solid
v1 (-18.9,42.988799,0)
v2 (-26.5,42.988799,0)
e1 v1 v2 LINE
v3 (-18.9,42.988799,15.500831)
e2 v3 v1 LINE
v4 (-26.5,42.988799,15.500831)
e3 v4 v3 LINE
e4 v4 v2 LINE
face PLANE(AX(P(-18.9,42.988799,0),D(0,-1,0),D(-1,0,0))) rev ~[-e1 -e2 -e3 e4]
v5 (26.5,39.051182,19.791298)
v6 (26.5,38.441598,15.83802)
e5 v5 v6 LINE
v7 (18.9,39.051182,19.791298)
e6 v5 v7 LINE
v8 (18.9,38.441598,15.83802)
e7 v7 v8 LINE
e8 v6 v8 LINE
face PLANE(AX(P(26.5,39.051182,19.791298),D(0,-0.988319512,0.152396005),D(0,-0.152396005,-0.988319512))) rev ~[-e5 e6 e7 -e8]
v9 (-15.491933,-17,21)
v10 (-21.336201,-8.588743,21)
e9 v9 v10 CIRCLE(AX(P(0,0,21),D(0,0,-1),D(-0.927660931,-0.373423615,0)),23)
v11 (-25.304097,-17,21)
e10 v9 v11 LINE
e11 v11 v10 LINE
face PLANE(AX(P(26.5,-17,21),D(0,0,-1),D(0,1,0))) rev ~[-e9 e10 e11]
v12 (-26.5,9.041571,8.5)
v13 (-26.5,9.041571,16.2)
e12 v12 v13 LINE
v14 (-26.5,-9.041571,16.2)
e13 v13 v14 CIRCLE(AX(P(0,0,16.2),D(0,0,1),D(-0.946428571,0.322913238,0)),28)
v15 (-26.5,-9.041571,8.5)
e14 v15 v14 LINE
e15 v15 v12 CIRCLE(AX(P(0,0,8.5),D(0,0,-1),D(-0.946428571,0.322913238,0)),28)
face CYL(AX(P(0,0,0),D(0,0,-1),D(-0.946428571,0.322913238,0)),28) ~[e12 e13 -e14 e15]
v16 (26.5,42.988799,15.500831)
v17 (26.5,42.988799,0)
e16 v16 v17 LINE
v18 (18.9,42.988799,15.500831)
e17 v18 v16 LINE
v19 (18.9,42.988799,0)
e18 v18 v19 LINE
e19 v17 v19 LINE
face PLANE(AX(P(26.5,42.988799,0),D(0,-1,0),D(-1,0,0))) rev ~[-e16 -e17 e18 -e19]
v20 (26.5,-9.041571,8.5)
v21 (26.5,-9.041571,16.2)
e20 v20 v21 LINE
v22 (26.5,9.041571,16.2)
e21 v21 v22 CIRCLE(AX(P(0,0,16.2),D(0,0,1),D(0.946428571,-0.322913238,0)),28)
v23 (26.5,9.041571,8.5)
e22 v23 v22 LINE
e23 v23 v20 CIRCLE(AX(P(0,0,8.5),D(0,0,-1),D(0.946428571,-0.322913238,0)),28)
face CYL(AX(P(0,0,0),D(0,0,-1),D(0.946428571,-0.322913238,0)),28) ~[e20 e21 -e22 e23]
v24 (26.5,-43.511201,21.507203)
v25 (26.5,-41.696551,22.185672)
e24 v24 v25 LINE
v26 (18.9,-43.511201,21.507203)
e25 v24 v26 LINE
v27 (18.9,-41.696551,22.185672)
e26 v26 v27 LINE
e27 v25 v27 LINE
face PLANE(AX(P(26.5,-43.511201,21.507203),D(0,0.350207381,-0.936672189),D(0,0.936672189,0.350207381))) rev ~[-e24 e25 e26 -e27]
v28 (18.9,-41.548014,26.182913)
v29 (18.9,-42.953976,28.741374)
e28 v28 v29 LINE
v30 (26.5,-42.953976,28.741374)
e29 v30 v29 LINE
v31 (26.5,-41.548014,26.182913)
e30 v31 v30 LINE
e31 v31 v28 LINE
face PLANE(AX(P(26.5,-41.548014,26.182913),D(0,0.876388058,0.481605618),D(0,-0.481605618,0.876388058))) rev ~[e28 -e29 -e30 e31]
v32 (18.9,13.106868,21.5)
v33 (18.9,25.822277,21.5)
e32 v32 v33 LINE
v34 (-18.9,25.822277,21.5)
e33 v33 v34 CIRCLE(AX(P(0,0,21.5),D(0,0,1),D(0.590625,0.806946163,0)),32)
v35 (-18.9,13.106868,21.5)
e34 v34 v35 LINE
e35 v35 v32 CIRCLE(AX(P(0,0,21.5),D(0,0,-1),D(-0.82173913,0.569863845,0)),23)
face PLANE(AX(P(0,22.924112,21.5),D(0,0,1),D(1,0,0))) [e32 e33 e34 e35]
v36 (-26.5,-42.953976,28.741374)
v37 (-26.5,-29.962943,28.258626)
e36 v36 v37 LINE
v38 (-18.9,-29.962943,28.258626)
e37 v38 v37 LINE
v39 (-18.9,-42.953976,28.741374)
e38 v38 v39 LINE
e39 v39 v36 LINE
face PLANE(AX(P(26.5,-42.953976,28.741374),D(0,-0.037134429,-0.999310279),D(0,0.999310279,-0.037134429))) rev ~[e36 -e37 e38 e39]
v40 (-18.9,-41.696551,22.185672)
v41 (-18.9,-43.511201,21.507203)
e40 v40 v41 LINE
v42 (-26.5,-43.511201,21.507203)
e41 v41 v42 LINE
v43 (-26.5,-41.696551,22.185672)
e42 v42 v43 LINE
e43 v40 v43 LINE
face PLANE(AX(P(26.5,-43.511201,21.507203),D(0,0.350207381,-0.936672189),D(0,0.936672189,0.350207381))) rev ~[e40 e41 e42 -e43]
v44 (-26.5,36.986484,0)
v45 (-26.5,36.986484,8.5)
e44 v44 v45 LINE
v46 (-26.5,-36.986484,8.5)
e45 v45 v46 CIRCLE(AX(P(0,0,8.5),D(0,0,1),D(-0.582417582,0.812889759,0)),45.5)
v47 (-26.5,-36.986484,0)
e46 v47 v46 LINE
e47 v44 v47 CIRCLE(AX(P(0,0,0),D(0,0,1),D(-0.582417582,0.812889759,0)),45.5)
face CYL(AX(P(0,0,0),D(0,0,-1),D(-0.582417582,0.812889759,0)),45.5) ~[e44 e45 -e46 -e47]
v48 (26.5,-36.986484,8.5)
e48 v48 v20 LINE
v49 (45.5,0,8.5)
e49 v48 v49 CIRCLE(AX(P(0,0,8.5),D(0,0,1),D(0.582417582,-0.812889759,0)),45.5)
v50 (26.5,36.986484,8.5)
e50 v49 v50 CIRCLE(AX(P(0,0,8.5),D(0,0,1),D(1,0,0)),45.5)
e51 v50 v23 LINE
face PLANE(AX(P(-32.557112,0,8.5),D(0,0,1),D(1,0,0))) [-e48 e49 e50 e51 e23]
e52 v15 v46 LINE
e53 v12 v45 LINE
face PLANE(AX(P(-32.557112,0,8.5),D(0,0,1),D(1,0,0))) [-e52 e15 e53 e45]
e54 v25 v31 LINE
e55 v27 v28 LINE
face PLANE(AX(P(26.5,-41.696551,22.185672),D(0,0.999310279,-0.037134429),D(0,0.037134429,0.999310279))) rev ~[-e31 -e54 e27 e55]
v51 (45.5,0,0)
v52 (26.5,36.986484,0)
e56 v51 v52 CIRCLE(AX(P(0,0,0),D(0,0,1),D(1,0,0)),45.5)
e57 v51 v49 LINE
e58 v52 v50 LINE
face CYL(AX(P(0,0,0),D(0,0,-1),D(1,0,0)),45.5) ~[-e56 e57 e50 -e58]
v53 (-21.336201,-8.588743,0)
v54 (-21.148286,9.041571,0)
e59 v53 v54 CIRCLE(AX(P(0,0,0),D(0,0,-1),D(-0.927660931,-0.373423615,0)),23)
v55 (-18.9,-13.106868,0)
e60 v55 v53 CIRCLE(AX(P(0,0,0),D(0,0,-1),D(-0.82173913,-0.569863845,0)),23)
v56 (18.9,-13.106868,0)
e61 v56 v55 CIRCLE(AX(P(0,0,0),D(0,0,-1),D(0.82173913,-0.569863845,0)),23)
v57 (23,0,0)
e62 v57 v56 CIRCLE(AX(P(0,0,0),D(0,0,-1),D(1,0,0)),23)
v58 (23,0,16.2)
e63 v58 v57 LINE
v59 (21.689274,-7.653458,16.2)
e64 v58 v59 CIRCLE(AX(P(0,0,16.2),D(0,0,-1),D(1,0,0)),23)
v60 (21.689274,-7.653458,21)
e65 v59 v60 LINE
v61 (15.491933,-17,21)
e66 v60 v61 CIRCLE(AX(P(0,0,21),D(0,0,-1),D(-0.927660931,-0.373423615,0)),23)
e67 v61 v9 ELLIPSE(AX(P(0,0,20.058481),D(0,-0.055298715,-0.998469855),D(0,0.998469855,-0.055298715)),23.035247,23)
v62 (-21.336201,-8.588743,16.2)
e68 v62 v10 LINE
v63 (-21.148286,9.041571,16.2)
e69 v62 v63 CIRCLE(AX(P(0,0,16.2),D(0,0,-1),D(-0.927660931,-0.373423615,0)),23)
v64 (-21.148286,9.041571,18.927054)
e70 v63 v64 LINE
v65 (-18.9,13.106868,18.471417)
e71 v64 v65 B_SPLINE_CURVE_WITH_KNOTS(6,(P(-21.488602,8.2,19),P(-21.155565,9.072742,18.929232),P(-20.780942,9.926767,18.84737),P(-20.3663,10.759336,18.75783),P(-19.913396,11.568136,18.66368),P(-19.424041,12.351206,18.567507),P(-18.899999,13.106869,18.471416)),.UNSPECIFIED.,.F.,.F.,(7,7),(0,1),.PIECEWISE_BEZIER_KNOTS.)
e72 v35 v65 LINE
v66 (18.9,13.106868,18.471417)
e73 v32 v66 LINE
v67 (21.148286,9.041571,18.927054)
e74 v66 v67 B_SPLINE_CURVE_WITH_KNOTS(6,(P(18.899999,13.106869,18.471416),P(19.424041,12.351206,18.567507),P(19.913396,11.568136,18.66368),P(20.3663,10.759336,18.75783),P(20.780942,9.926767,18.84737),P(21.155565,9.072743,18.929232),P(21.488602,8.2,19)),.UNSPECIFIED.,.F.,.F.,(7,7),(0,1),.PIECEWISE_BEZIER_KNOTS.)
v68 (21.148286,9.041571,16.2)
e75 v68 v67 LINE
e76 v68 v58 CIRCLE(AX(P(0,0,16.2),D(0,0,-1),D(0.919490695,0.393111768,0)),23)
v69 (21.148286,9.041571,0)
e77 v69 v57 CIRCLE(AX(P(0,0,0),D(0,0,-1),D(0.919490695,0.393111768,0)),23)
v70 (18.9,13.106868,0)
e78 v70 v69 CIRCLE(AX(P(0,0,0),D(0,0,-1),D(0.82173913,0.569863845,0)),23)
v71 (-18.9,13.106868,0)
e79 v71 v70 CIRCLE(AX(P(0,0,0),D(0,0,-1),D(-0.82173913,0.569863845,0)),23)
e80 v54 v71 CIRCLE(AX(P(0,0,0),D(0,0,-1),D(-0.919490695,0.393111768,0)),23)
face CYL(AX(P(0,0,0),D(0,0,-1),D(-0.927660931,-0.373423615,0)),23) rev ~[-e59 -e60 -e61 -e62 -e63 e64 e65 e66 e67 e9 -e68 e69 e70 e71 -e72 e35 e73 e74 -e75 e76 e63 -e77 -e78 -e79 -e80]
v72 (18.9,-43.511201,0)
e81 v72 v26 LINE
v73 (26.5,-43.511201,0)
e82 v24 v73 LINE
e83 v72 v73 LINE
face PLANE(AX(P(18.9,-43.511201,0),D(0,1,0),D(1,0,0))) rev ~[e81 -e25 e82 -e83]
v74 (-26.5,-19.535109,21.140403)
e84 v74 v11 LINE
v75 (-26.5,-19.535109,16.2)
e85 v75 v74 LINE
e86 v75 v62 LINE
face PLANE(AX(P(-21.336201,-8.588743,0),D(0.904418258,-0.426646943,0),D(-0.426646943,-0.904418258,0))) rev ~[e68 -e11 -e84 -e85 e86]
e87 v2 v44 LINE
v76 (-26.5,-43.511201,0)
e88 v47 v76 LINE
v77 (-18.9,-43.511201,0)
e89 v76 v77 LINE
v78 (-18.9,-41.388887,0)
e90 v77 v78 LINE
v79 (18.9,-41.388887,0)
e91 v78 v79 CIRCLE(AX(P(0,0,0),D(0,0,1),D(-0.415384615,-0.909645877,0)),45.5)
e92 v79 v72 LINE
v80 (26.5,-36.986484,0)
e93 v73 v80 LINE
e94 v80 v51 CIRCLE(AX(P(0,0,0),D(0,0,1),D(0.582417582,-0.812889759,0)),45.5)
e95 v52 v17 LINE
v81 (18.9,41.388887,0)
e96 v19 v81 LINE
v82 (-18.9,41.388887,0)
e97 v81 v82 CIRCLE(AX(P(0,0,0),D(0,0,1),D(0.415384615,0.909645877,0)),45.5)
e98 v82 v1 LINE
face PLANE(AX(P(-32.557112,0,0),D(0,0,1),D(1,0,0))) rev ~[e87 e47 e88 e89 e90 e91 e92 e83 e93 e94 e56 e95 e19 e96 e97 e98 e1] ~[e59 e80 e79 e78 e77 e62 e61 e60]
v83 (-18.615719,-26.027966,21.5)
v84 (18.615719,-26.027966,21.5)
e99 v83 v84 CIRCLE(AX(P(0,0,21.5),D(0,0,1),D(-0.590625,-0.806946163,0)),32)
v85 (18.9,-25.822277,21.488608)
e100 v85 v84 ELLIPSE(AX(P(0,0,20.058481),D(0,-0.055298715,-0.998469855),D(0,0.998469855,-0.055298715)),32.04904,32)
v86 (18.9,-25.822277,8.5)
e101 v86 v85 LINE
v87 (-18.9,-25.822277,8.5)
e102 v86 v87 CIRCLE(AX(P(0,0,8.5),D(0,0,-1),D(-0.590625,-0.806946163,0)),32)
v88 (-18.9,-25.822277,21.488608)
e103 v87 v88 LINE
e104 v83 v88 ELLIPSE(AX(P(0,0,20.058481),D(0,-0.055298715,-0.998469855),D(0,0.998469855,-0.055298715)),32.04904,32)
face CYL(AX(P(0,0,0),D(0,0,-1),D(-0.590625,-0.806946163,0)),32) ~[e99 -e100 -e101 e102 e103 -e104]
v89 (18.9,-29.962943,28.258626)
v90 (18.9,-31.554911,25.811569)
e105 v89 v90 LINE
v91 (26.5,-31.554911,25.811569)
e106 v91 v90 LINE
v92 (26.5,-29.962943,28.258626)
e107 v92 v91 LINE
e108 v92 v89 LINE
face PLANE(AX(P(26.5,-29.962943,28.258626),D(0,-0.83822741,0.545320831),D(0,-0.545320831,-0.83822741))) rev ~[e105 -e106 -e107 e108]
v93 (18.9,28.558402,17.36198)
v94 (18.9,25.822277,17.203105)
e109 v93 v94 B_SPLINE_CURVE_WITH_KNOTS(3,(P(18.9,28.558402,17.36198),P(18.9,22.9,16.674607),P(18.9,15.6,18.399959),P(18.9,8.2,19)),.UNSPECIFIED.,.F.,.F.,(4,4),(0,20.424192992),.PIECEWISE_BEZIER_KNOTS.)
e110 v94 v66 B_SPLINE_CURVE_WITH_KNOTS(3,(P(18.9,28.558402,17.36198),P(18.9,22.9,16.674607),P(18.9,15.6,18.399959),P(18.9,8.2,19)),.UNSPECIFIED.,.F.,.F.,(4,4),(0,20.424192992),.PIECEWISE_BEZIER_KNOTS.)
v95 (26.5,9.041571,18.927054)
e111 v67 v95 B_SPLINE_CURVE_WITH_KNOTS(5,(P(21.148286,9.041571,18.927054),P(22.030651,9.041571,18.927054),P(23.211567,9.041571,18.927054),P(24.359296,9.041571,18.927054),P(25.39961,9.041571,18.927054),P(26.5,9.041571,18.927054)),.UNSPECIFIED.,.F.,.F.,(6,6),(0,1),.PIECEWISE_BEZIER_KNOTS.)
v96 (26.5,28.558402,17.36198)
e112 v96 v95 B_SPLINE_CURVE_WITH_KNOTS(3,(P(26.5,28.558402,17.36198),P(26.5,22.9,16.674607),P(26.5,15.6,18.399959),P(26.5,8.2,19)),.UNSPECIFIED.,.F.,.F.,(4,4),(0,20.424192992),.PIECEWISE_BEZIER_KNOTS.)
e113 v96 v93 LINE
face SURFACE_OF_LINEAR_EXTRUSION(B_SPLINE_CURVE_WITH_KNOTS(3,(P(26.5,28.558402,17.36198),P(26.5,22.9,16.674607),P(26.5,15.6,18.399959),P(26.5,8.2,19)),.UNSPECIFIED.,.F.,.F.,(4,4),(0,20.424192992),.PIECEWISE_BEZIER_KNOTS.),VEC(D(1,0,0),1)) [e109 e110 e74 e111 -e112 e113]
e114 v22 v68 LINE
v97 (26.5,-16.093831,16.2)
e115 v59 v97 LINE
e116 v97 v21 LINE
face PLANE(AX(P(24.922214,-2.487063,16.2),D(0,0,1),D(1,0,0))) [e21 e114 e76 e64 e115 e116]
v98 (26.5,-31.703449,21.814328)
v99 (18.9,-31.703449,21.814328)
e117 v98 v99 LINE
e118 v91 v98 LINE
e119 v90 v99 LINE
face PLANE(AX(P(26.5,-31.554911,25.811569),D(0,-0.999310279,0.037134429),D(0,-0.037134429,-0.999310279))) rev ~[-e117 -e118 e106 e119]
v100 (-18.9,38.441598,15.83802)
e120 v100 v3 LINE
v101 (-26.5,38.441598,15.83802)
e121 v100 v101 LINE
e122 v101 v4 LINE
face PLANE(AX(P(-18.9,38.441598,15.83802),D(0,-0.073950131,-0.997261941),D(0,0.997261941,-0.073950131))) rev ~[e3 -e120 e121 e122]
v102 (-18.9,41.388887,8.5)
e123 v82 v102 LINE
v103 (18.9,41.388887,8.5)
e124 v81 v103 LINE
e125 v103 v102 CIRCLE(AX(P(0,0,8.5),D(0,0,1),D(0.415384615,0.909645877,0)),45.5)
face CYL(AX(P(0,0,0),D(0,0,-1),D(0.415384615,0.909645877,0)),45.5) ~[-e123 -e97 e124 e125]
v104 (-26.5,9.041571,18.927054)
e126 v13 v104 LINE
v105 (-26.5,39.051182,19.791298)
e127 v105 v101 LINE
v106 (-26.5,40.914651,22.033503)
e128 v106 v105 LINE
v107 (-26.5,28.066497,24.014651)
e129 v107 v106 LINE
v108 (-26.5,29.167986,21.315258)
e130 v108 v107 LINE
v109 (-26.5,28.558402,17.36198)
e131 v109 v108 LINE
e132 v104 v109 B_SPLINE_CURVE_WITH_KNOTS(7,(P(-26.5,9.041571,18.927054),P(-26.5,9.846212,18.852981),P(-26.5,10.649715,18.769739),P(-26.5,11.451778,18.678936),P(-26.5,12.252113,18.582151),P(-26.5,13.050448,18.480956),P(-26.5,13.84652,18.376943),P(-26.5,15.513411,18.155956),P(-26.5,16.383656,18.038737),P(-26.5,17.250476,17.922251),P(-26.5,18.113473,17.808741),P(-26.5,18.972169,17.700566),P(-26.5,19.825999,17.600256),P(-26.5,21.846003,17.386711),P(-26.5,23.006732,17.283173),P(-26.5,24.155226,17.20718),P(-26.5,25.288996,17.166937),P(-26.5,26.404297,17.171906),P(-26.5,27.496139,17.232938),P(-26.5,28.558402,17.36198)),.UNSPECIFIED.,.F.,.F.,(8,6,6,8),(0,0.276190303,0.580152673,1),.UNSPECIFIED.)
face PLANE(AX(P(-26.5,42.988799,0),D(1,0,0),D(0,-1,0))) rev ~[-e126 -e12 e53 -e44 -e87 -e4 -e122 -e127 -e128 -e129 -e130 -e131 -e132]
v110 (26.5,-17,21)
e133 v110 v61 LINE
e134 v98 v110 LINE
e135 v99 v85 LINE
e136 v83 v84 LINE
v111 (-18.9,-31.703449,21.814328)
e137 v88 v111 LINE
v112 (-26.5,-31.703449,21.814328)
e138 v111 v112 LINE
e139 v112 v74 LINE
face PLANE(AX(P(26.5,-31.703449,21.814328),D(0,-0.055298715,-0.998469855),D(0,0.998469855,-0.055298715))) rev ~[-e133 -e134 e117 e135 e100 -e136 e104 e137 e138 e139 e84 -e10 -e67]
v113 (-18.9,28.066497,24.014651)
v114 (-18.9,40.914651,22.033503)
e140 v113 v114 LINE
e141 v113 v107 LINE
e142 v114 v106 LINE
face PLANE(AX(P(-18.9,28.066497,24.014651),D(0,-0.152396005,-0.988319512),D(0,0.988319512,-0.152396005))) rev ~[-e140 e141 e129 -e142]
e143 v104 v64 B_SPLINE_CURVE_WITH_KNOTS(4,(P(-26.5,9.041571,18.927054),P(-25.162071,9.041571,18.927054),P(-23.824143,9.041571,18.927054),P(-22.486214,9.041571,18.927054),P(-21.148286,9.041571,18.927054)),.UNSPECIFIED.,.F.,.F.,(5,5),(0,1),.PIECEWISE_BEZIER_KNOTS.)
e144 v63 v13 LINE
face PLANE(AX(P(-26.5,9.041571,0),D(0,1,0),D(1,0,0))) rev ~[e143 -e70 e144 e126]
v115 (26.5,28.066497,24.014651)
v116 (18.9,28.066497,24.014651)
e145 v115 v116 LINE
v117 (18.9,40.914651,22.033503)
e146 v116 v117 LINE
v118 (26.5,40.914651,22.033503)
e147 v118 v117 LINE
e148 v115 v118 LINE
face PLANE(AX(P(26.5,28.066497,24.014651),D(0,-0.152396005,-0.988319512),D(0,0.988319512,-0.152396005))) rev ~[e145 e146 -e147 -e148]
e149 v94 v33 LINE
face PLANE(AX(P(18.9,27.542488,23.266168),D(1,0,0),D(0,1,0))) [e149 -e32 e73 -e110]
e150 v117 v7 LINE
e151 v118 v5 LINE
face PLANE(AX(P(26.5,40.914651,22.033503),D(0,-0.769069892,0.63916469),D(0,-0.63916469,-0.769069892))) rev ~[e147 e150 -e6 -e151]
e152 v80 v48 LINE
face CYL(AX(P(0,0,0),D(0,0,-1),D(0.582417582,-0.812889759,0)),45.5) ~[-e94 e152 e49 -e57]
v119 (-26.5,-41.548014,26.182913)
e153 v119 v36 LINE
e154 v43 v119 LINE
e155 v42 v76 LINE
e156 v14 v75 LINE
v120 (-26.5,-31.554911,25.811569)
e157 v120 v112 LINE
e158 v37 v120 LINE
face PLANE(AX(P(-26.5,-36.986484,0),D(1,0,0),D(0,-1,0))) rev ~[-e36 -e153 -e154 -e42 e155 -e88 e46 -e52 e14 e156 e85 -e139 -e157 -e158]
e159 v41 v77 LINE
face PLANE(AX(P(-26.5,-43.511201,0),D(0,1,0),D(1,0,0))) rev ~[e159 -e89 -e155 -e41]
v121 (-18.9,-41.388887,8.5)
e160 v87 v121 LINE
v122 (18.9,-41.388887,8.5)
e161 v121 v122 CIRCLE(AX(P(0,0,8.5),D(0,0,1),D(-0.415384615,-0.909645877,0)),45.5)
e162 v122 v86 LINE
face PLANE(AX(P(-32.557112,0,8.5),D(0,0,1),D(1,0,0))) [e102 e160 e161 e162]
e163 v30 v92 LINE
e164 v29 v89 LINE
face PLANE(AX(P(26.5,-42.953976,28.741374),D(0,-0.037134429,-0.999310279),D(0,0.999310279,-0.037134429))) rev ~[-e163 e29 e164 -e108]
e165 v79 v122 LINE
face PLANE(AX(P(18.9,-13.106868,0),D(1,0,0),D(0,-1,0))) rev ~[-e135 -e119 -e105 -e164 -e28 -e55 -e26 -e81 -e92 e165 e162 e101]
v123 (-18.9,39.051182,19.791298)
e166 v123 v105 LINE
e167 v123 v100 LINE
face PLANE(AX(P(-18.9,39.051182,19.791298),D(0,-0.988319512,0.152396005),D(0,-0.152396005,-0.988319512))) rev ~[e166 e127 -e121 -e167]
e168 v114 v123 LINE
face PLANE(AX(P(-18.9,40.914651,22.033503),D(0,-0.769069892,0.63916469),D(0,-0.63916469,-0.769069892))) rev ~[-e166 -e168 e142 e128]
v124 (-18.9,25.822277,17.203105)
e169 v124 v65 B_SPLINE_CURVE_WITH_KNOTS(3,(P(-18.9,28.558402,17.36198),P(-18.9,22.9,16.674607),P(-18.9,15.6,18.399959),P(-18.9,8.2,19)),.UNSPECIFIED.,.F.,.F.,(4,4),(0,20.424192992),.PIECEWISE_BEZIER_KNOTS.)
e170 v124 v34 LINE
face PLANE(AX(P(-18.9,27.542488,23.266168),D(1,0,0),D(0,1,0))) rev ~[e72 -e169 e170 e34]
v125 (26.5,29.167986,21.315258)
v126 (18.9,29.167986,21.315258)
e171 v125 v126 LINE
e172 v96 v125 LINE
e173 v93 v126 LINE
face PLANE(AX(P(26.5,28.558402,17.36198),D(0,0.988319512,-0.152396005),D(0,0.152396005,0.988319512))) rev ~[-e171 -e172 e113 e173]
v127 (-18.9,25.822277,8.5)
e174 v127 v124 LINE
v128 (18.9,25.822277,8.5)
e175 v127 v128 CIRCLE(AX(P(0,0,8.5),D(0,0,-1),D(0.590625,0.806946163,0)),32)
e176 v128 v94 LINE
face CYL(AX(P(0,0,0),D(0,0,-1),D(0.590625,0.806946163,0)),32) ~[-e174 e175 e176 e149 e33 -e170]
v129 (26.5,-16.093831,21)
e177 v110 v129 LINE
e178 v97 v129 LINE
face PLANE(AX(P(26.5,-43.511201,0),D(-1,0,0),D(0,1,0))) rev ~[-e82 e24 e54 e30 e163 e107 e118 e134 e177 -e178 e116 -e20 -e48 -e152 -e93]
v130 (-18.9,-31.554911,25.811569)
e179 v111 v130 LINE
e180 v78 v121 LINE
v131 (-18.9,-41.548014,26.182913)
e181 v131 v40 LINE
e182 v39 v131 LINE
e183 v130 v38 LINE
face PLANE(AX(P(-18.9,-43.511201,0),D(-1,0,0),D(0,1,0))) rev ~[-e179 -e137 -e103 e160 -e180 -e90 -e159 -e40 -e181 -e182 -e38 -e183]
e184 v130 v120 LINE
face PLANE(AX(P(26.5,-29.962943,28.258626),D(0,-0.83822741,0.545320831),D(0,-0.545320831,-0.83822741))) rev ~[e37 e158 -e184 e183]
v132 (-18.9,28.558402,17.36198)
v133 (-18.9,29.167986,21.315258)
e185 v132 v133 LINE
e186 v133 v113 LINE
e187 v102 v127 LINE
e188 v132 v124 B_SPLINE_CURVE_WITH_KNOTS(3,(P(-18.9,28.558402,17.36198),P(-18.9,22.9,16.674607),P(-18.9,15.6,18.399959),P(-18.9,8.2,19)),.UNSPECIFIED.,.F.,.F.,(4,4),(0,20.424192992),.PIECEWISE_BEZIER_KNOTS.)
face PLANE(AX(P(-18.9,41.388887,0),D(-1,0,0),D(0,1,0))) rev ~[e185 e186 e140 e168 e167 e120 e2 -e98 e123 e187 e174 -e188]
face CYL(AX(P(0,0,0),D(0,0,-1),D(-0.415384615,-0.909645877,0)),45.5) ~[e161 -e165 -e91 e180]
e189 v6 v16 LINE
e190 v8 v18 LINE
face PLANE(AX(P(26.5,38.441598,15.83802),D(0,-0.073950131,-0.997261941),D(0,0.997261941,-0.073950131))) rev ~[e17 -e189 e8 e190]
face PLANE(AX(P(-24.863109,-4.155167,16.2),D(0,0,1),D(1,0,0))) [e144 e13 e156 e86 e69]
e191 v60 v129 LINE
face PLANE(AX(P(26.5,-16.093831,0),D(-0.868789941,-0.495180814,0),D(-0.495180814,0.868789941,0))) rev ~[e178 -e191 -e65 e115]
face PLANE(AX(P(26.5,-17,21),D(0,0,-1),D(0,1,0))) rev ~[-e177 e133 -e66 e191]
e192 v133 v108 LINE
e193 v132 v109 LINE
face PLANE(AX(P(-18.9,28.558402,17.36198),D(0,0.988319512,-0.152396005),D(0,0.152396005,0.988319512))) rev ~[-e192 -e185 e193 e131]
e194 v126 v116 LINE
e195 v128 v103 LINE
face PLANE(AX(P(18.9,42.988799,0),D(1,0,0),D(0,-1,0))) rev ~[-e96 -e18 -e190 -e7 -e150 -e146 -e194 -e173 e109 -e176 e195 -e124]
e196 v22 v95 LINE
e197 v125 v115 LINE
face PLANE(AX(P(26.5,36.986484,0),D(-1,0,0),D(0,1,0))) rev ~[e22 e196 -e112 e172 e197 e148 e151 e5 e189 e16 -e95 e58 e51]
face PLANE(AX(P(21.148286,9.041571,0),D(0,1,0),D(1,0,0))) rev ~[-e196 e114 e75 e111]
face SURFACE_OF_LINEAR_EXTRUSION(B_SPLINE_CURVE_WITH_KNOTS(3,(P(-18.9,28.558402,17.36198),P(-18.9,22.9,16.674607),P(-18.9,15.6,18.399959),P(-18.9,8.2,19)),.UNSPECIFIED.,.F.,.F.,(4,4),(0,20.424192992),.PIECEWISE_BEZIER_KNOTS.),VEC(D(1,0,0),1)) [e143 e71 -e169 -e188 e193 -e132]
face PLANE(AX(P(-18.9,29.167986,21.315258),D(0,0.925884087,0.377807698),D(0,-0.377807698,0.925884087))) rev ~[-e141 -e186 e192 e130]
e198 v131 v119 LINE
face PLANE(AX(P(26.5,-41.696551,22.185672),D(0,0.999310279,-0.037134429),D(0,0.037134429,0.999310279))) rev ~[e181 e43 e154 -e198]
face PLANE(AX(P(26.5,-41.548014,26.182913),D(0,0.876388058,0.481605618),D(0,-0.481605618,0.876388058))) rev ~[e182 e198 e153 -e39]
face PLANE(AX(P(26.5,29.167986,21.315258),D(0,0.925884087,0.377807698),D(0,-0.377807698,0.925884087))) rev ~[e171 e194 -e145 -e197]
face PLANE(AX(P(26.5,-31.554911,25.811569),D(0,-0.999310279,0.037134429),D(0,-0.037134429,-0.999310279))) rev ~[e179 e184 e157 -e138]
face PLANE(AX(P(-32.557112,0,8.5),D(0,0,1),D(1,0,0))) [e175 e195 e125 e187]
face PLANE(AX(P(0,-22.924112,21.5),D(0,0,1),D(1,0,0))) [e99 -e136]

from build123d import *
from build123d import SkipClean  # not in build123d's __all__

# Parameters (mm, degrees)
F2_DEPTH = 8.5
F3_DEPTH = 29
F4_DEPTH = 16.2
F5_DEPTH = 21.5
F6_W     = 8.4938306999
F6_H     = 8
F7_DEPTH = 53
F8_DEPTH = 7.6
F9_START = -45.4
F9_DEPTH = 9.2


with BuildPart() as f2:
    # F0 (on Top) → F2 (new body)
    with BuildSketch(Plane.XY):
        with BuildLine():
            ThreePointArc((-26.5, -9.04157066), (-28, 0), (-26.5, 9.04157066))
            Line((-26.5, 9.04157066), (-26.5, 36.9864840178))
            ThreePointArc((-26.5, 36.9864840178), (-45.5, 0), (-26.5, -36.9864840178))
            Line((-26.5, -36.9864840178), (-26.5, -19.535109446))
            Line((-26.5, -19.535109446), (-26.5, -9.04157066))
        make_face()
        with BuildLine():
            Line((18.9, -41.3888873975), (18.9, -25.822277204))
            ThreePointArc((18.9, -25.822277204), (0, -32), (-18.9, -25.822277204))
            Line((-18.9, -25.822277204), (-18.9, -41.3888873975))
            ThreePointArc((-18.9, -41.3888873975), (0, -45.5), (18.9, -41.3888873975))
        make_face()
        with BuildLine():
            Line((26.5, 36.9864840178), (26.5, 9.04157066))
            ThreePointArc((26.5, 9.04157066), (28, 0), (26.5, -9.04157066))
            Line((26.5, -9.04157066), (26.5, -16.0938306999))
            Line((26.5, -16.0938306999), (26.5, -36.9864840178))
            ThreePointArc((26.5, -36.9864840178), (40.4722126897, -20.7906228863), (45.5, 0))
            ThreePointArc((45.5, 0), (40.4722126897, 20.7906228863), (26.5, 36.9864840178))
        make_face()
        with BuildLine():
            ThreePointArc((-18.9, 25.822277204), (0, 32), (18.9, 25.822277204))
            Line((18.9, 25.822277204), (18.9, 41.3888873975))
            ThreePointArc((18.9, 41.3888873975), (0, 45.5), (-18.9, 41.3888873975))
            Line((-18.9, 41.3888873975), (-18.9, 25.822277204))
        make_face()
        with BuildLine():
            Line((-18.9, -25.822277204), (-18.9, -13.1068684284))
            ThreePointArc((-18.9, -13.1068684284), (-20.2445385279, -10.915981852), (-21.3362014212, -8.588743151))
            Line((-21.3362014212, -8.588743151), (-26.5, -19.535109446))
            Line((-26.5, -19.535109446), (-26.5, -36.9864840178))
            ThreePointArc((-26.5, -36.9864840178), (-22.806474714, -39.3714961758), (-18.9, -41.3888873975))
            Line((-18.9, -41.3888873975), (-18.9, -25.822277204))
        make_face()
        with BuildLine():
            Line((18.9, -25.822277204), (18.9, -13.1068684284))
            ThreePointArc((18.9, -13.1068684284), (0, -23), (-18.9, -13.1068684284))
            Line((-18.9, -13.1068684284), (-18.9, -25.822277204))
            ThreePointArc((-18.9, -25.822277204), (0, -32), (18.9, -25.822277204))
        make_face()
        with BuildLine():
            Line((26.5, -16.0938306999), (21.6892735119, -7.6534576843))
            ThreePointArc((21.6892735119, -7.6534576843), (20.4769920458, -10.4734329022), (18.9, -13.1068684284))
            Line((18.9, -13.1068684284), (18.9, -25.822277204))
            Line((18.9, -25.822277204), (18.9, -41.3888873975))
            ThreePointArc((18.9, -41.3888873975), (22.806474714, -39.3714961758), (26.5, -36.9864840178))
            Line((26.5, -36.9864840178), (26.5, -16.0938306999))
        make_face()
        with BuildLine():
            ThreePointArc((21.1482859826, 9.04157066), (22.5323165431, 4.614619291), (23, 0))
            ThreePointArc((23, 0), (22.6699502731, -3.8824418364), (21.6892735119, -7.6534576843))
            Line((21.6892735119, -7.6534576843), (26.5, -16.0938306999))
            Line((26.5, -16.0938306999), (26.5, -9.04157066))
            ThreePointArc((26.5, -9.04157066), (28, 0), (26.5, 9.04157066))
            Line((26.5, 9.04157066), (21.1482859826, 9.04157066))
        make_face()
        with BuildLine():
            ThreePointArc((18.9, 13.1068684284), (20.127045586, 11.1311291421), (21.1482859826, 9.04157066))
            Line((21.1482859826, 9.04157066), (26.5, 9.04157066))
            Line((26.5, 9.04157066), (26.5, 36.9864840178))
            ThreePointArc((26.5, 36.9864840178), (22.806474714, 39.3714961758), (18.9, 41.3888873975))
            Line((18.9, 41.3888873975), (18.9, 25.822277204))
            Line((18.9, 25.822277204), (18.9, 13.1068684284))
        make_face()
        with BuildLine():
            ThreePointArc((-18.9, 13.1068684284), (0, 23), (18.9, 13.1068684284))
            Line((18.9, 13.1068684284), (18.9, 25.822277204))
            ThreePointArc((18.9, 25.822277204), (0, 32), (-18.9, 25.822277204))
            Line((-18.9, 25.822277204), (-18.9, 13.1068684284))
        make_face()
        with BuildLine():
            ThreePointArc((-21.1482859826, 9.04157066), (-20.127045586, 11.1311291421), (-18.9, 13.1068684284))
            Line((-18.9, 13.1068684284), (-18.9, 25.822277204))
            Line((-18.9, 25.822277204), (-18.9, 41.3888873975))
            ThreePointArc((-18.9, 41.3888873975), (-22.806474714, 39.3714961758), (-26.5, 36.9864840178))
            Line((-26.5, 36.9864840178), (-26.5, 9.04157066))
            Line((-26.5, 9.04157066), (-21.1482859826, 9.04157066))
        make_face()
        with BuildLine():
            ThreePointArc((-21.3362014212, -8.588743151), (-22.9986936316, 0.245135149), (-21.1482859826, 9.04157066))
            Line((-21.1482859826, 9.04157066), (-26.5, 9.04157066))
            ThreePointArc((-26.5, 9.04157066), (-28, 0), (-26.5, -9.04157066))
            Line((-26.5, -9.04157066), (-26.5, -19.535109446))
            Line((-26.5, -19.535109446), (-21.3362014212, -8.588743151))
        make_face()
        with BuildLine():
            ThreePointArc((-26.5, 36.9864840178), (-22.806474714, 39.3714961758), (-18.9, 41.3888873975))
            Line((-18.9, 41.3888873975), (-18.9, 42.9887993038))
            Line((-18.9, 42.9887993038), (-26.5, 42.9887993038))
            Line((-26.5, 42.9887993038), (-26.5, 36.9864840178))
        make_face()
        with BuildLine():
            ThreePointArc((18.9, 41.3888873975), (22.806474714, 39.3714961758), (26.5, 36.9864840178))
            Line((26.5, 36.9864840178), (26.5, 42.9887993038))
            Line((26.5, 42.9887993038), (18.9, 42.9887993038))
            Line((18.9, 42.9887993038), (18.9, 41.3888873975))
        make_face()
        with BuildLine():
            Line((26.5, -43.5112006962), (26.5, -36.9864840178))
            ThreePointArc((26.5, -36.9864840178), (22.806474714, -39.3714961758), (18.9, -41.3888873975))
            Line((18.9, -41.3888873975), (18.9, -43.5112006962))
            Line((18.9, -43.5112006962), (26.5, -43.5112006962))
        make_face()
        with BuildLine():
            Line((-18.9, -43.5112006962), (-18.9, -41.3888873975))
            ThreePointArc((-18.9, -41.3888873975), (-22.806474714, -39.3714961758), (-26.5, -36.9864840178))
            Line((-26.5, -36.9864840178), (-26.5, -43.5112006962))
            Line((-26.5, -43.5112006962), (-18.9, -43.5112006962))
        make_face()
    extrude(amount=F2_DEPTH)

    # F0 (on Top) → F3 (join)
    with BuildSketch(Plane.XY):
        with BuildLine():
            Line((-18.9, -25.822277204), (-18.9, -13.1068684284))
            ThreePointArc((-18.9, -13.1068684284), (-20.2445385279, -10.915981852), (-21.3362014212, -8.588743151))
            Line((-21.3362014212, -8.588743151), (-26.5, -19.535109446))
            Line((-26.5, -19.535109446), (-26.5, -36.9864840178))
            ThreePointArc((-26.5, -36.9864840178), (-22.806474714, -39.3714961758), (-18.9, -41.3888873975))
            Line((-18.9, -41.3888873975), (-18.9, -25.822277204))
        make_face()
        with BuildLine():
            ThreePointArc((-21.1482859826, 9.04157066), (-20.127045586, 11.1311291421), (-18.9, 13.1068684284))
            Line((-18.9, 13.1068684284), (-18.9, 25.822277204))
            Line((-18.9, 25.822277204), (-18.9, 41.3888873975))
            ThreePointArc((-18.9, 41.3888873975), (-22.806474714, 39.3714961758), (-26.5, 36.9864840178))
            Line((-26.5, 36.9864840178), (-26.5, 9.04157066))
            Line((-26.5, 9.04157066), (-21.1482859826, 9.04157066))
        make_face()
        with BuildLine():
            ThreePointArc((18.9, 13.1068684284), (20.127045586, 11.1311291421), (21.1482859826, 9.04157066))
            Line((21.1482859826, 9.04157066), (26.5, 9.04157066))
            Line((26.5, 9.04157066), (26.5, 36.9864840178))
            ThreePointArc((26.5, 36.9864840178), (22.806474714, 39.3714961758), (18.9, 41.3888873975))
            Line((18.9, 41.3888873975), (18.9, 25.822277204))
            Line((18.9, 25.822277204), (18.9, 13.1068684284))
        make_face()
        with BuildLine():
            Line((26.5, -16.0938306999), (21.6892735119, -7.6534576843))
            ThreePointArc((21.6892735119, -7.6534576843), (20.4769920458, -10.4734329022), (18.9, -13.1068684284))
            Line((18.9, -13.1068684284), (18.9, -25.822277204))
            Line((18.9, -25.822277204), (18.9, -41.3888873975))
            ThreePointArc((18.9, -41.3888873975), (22.806474714, -39.3714961758), (26.5, -36.9864840178))
            Line((26.5, -36.9864840178), (26.5, -16.0938306999))
        make_face()
        with BuildLine():
            Line((-18.9, -43.5112006962), (-18.9, -41.3888873975))
            ThreePointArc((-18.9, -41.3888873975), (-22.806474714, -39.3714961758), (-26.5, -36.9864840178))
            Line((-26.5, -36.9864840178), (-26.5, -43.5112006962))
            Line((-26.5, -43.5112006962), (-18.9, -43.5112006962))
        make_face()
        with BuildLine():
            Line((26.5, -43.5112006962), (26.5, -36.9864840178))
            ThreePointArc((26.5, -36.9864840178), (22.806474714, -39.3714961758), (18.9, -41.3888873975))
            Line((18.9, -41.3888873975), (18.9, -43.5112006962))
            Line((18.9, -43.5112006962), (26.5, -43.5112006962))
        make_face()
        with BuildLine():
            ThreePointArc((18.9, 41.3888873975), (22.806474714, 39.3714961758), (26.5, 36.9864840178))
            Line((26.5, 36.9864840178), (26.5, 42.9887993038))
            Line((26.5, 42.9887993038), (18.9, 42.9887993038))
            Line((18.9, 42.9887993038), (18.9, 41.3888873975))
        make_face()
        with BuildLine():
            ThreePointArc((-26.5, 36.9864840178), (-22.806474714, 39.3714961758), (-18.9, 41.3888873975))
            Line((-18.9, 41.3888873975), (-18.9, 42.9887993038))
            Line((-18.9, 42.9887993038), (-26.5, 42.9887993038))
            Line((-26.5, 42.9887993038), (-26.5, 36.9864840178))
        make_face()
    with SkipClean():  # cleaning this boolean's faces spoils the solid; the shape is the same uncleaned
        extrude(amount=F3_DEPTH)

    # F0 (on Top) → F4 (join)
    with BuildSketch(Plane.XY):
        with BuildLine():
            ThreePointArc((-21.3362014212, -8.588743151), (-22.9986936316, 0.245135149), (-21.1482859826, 9.04157066))
            Line((-21.1482859826, 9.04157066), (-26.5, 9.04157066))
            ThreePointArc((-26.5, 9.04157066), (-28, 0), (-26.5, -9.04157066))
            Line((-26.5, -9.04157066), (-26.5, -19.535109446))
            Line((-26.5, -19.535109446), (-21.3362014212, -8.588743151))
        make_face()
        with BuildLine():
            ThreePointArc((21.1482859826, 9.04157066), (22.5323165431, 4.614619291), (23, 0))
            ThreePointArc((23, 0), (22.6699502731, -3.8824418364), (21.6892735119, -7.6534576843))
            Line((21.6892735119, -7.6534576843), (26.5, -16.0938306999))
            Line((26.5, -16.0938306999), (26.5, -9.04157066))
            ThreePointArc((26.5, -9.04157066), (28, 0), (26.5, 9.04157066))
            Line((26.5, 9.04157066), (21.1482859826, 9.04157066))
        make_face()
    extrude(amount=F4_DEPTH)

    # F0 (on Top) → F5 (join)
    with BuildSketch(Plane.XY):
        with BuildLine():
            ThreePointArc((-18.9, 13.1068684284), (0, 23), (18.9, 13.1068684284))
            Line((18.9, 13.1068684284), (18.9, 25.822277204))
            ThreePointArc((18.9, 25.822277204), (0, 32), (-18.9, 25.822277204))
            Line((-18.9, 25.822277204), (-18.9, 13.1068684284))
        make_face()
        with BuildLine():
            Line((18.9, -25.822277204), (18.9, -13.1068684284))
            ThreePointArc((18.9, -13.1068684284), (0, -23), (-18.9, -13.1068684284))
            Line((-18.9, -13.1068684284), (-18.9, -25.822277204))
            ThreePointArc((-18.9, -25.822277204), (0, -32), (18.9, -25.822277204))
        make_face()
    extrude(amount=F5_DEPTH)

    # F6 (on face) → F7 (cut)
    with BuildSketch(Plane.YZ.offset(26.5)):
        Polygon((-31.7034486039, 21.8143278533), (-17, 21), (-16.0938306999, 21), (-16.0938306999, 29), (-43.5112006962, 29), (-43.5112006962, 21.5072025748), (-41.6965513961, 22.1856721467), (-41.5480136787, 26.1829132636), (-42.9539764288, 28.7413737907), (-29.9629427989, 28.2586262093), (-31.5549108865, 25.8115689702), align=None)
        with Locations((-11.8469153499, 25)):
            Rectangle(F6_W, F6_H)
    extrude(amount=-F7_DEPTH, mode=Mode.SUBTRACT)

    # F6 (on face) → F8 (cut, through all)
    with BuildSketch(Plane.YZ.offset(26.5)):
        with BuildLine():
            Line((38.4415975598, 15.8380199759), (43, 15.5))
            Line((43, 15.5), (43, 29))
            Line((43, 29), (8.2, 29))
            Line((8.2, 29), (8.2, 19))
            add(Edge.make_bspline(
                [(28.5584024402, 17.3619800241), (22.9, 16.6746068906), (15.6, 18.3999594301), (8.2, 19)],
                knots=[0, 0, 0, 0, 20.4241929916, 20.4241929916, 20.4241929916, 20.4241929916], degree=3))
            Line((28.5584024402, 17.3619800241), (29.1679864595, 21.3152580719))
            Line((29.1679864595, 21.3152580719), (28.0664972036, 24.014650859))
            Line((28.0664972036, 24.014650859), (40.914650859, 22.0335027964))
            Line((40.914650859, 22.0335027964), (39.051181579, 19.7912980238))
            Line((39.051181579, 19.7912980238), (38.4415975598, 15.8380199759))
        make_face()
    extrude(amount=-F8_DEPTH, mode=Mode.SUBTRACT)

    # F6 (on face) → F9 (cut)
    with BuildSketch(Plane.YZ.offset(26.5).offset(F9_START)):
        with BuildLine():
            Line((38.4415975598, 15.8380199759), (43, 15.5))
            Line((43, 15.5), (43, 29))
            Line((43, 29), (8.2, 29))
            Line((8.2, 29), (8.2, 19))
            add(Edge.make_bspline(
                [(28.5584024402, 17.3619800241), (22.9, 16.6746068906), (15.6, 18.3999594301), (8.2, 19)],
                knots=[0, 0, 0, 0, 20.4241929916, 20.4241929916, 20.4241929916, 20.4241929916], degree=3))
            Line((28.5584024402, 17.3619800241), (29.1679864595, 21.3152580719))
            Line((29.1679864595, 21.3152580719), (28.0664972036, 24.014650859))
            Line((28.0664972036, 24.014650859), (40.914650859, 22.0335027964))
            Line((40.914650859, 22.0335027964), (39.051181579, 19.7912980238))
            Line((39.051181579, 19.7912980238), (38.4415975598, 15.8380199759))
        make_face()
    extrude(amount=-F9_DEPTH, mode=Mode.SUBTRACT)


solid = f2.part
